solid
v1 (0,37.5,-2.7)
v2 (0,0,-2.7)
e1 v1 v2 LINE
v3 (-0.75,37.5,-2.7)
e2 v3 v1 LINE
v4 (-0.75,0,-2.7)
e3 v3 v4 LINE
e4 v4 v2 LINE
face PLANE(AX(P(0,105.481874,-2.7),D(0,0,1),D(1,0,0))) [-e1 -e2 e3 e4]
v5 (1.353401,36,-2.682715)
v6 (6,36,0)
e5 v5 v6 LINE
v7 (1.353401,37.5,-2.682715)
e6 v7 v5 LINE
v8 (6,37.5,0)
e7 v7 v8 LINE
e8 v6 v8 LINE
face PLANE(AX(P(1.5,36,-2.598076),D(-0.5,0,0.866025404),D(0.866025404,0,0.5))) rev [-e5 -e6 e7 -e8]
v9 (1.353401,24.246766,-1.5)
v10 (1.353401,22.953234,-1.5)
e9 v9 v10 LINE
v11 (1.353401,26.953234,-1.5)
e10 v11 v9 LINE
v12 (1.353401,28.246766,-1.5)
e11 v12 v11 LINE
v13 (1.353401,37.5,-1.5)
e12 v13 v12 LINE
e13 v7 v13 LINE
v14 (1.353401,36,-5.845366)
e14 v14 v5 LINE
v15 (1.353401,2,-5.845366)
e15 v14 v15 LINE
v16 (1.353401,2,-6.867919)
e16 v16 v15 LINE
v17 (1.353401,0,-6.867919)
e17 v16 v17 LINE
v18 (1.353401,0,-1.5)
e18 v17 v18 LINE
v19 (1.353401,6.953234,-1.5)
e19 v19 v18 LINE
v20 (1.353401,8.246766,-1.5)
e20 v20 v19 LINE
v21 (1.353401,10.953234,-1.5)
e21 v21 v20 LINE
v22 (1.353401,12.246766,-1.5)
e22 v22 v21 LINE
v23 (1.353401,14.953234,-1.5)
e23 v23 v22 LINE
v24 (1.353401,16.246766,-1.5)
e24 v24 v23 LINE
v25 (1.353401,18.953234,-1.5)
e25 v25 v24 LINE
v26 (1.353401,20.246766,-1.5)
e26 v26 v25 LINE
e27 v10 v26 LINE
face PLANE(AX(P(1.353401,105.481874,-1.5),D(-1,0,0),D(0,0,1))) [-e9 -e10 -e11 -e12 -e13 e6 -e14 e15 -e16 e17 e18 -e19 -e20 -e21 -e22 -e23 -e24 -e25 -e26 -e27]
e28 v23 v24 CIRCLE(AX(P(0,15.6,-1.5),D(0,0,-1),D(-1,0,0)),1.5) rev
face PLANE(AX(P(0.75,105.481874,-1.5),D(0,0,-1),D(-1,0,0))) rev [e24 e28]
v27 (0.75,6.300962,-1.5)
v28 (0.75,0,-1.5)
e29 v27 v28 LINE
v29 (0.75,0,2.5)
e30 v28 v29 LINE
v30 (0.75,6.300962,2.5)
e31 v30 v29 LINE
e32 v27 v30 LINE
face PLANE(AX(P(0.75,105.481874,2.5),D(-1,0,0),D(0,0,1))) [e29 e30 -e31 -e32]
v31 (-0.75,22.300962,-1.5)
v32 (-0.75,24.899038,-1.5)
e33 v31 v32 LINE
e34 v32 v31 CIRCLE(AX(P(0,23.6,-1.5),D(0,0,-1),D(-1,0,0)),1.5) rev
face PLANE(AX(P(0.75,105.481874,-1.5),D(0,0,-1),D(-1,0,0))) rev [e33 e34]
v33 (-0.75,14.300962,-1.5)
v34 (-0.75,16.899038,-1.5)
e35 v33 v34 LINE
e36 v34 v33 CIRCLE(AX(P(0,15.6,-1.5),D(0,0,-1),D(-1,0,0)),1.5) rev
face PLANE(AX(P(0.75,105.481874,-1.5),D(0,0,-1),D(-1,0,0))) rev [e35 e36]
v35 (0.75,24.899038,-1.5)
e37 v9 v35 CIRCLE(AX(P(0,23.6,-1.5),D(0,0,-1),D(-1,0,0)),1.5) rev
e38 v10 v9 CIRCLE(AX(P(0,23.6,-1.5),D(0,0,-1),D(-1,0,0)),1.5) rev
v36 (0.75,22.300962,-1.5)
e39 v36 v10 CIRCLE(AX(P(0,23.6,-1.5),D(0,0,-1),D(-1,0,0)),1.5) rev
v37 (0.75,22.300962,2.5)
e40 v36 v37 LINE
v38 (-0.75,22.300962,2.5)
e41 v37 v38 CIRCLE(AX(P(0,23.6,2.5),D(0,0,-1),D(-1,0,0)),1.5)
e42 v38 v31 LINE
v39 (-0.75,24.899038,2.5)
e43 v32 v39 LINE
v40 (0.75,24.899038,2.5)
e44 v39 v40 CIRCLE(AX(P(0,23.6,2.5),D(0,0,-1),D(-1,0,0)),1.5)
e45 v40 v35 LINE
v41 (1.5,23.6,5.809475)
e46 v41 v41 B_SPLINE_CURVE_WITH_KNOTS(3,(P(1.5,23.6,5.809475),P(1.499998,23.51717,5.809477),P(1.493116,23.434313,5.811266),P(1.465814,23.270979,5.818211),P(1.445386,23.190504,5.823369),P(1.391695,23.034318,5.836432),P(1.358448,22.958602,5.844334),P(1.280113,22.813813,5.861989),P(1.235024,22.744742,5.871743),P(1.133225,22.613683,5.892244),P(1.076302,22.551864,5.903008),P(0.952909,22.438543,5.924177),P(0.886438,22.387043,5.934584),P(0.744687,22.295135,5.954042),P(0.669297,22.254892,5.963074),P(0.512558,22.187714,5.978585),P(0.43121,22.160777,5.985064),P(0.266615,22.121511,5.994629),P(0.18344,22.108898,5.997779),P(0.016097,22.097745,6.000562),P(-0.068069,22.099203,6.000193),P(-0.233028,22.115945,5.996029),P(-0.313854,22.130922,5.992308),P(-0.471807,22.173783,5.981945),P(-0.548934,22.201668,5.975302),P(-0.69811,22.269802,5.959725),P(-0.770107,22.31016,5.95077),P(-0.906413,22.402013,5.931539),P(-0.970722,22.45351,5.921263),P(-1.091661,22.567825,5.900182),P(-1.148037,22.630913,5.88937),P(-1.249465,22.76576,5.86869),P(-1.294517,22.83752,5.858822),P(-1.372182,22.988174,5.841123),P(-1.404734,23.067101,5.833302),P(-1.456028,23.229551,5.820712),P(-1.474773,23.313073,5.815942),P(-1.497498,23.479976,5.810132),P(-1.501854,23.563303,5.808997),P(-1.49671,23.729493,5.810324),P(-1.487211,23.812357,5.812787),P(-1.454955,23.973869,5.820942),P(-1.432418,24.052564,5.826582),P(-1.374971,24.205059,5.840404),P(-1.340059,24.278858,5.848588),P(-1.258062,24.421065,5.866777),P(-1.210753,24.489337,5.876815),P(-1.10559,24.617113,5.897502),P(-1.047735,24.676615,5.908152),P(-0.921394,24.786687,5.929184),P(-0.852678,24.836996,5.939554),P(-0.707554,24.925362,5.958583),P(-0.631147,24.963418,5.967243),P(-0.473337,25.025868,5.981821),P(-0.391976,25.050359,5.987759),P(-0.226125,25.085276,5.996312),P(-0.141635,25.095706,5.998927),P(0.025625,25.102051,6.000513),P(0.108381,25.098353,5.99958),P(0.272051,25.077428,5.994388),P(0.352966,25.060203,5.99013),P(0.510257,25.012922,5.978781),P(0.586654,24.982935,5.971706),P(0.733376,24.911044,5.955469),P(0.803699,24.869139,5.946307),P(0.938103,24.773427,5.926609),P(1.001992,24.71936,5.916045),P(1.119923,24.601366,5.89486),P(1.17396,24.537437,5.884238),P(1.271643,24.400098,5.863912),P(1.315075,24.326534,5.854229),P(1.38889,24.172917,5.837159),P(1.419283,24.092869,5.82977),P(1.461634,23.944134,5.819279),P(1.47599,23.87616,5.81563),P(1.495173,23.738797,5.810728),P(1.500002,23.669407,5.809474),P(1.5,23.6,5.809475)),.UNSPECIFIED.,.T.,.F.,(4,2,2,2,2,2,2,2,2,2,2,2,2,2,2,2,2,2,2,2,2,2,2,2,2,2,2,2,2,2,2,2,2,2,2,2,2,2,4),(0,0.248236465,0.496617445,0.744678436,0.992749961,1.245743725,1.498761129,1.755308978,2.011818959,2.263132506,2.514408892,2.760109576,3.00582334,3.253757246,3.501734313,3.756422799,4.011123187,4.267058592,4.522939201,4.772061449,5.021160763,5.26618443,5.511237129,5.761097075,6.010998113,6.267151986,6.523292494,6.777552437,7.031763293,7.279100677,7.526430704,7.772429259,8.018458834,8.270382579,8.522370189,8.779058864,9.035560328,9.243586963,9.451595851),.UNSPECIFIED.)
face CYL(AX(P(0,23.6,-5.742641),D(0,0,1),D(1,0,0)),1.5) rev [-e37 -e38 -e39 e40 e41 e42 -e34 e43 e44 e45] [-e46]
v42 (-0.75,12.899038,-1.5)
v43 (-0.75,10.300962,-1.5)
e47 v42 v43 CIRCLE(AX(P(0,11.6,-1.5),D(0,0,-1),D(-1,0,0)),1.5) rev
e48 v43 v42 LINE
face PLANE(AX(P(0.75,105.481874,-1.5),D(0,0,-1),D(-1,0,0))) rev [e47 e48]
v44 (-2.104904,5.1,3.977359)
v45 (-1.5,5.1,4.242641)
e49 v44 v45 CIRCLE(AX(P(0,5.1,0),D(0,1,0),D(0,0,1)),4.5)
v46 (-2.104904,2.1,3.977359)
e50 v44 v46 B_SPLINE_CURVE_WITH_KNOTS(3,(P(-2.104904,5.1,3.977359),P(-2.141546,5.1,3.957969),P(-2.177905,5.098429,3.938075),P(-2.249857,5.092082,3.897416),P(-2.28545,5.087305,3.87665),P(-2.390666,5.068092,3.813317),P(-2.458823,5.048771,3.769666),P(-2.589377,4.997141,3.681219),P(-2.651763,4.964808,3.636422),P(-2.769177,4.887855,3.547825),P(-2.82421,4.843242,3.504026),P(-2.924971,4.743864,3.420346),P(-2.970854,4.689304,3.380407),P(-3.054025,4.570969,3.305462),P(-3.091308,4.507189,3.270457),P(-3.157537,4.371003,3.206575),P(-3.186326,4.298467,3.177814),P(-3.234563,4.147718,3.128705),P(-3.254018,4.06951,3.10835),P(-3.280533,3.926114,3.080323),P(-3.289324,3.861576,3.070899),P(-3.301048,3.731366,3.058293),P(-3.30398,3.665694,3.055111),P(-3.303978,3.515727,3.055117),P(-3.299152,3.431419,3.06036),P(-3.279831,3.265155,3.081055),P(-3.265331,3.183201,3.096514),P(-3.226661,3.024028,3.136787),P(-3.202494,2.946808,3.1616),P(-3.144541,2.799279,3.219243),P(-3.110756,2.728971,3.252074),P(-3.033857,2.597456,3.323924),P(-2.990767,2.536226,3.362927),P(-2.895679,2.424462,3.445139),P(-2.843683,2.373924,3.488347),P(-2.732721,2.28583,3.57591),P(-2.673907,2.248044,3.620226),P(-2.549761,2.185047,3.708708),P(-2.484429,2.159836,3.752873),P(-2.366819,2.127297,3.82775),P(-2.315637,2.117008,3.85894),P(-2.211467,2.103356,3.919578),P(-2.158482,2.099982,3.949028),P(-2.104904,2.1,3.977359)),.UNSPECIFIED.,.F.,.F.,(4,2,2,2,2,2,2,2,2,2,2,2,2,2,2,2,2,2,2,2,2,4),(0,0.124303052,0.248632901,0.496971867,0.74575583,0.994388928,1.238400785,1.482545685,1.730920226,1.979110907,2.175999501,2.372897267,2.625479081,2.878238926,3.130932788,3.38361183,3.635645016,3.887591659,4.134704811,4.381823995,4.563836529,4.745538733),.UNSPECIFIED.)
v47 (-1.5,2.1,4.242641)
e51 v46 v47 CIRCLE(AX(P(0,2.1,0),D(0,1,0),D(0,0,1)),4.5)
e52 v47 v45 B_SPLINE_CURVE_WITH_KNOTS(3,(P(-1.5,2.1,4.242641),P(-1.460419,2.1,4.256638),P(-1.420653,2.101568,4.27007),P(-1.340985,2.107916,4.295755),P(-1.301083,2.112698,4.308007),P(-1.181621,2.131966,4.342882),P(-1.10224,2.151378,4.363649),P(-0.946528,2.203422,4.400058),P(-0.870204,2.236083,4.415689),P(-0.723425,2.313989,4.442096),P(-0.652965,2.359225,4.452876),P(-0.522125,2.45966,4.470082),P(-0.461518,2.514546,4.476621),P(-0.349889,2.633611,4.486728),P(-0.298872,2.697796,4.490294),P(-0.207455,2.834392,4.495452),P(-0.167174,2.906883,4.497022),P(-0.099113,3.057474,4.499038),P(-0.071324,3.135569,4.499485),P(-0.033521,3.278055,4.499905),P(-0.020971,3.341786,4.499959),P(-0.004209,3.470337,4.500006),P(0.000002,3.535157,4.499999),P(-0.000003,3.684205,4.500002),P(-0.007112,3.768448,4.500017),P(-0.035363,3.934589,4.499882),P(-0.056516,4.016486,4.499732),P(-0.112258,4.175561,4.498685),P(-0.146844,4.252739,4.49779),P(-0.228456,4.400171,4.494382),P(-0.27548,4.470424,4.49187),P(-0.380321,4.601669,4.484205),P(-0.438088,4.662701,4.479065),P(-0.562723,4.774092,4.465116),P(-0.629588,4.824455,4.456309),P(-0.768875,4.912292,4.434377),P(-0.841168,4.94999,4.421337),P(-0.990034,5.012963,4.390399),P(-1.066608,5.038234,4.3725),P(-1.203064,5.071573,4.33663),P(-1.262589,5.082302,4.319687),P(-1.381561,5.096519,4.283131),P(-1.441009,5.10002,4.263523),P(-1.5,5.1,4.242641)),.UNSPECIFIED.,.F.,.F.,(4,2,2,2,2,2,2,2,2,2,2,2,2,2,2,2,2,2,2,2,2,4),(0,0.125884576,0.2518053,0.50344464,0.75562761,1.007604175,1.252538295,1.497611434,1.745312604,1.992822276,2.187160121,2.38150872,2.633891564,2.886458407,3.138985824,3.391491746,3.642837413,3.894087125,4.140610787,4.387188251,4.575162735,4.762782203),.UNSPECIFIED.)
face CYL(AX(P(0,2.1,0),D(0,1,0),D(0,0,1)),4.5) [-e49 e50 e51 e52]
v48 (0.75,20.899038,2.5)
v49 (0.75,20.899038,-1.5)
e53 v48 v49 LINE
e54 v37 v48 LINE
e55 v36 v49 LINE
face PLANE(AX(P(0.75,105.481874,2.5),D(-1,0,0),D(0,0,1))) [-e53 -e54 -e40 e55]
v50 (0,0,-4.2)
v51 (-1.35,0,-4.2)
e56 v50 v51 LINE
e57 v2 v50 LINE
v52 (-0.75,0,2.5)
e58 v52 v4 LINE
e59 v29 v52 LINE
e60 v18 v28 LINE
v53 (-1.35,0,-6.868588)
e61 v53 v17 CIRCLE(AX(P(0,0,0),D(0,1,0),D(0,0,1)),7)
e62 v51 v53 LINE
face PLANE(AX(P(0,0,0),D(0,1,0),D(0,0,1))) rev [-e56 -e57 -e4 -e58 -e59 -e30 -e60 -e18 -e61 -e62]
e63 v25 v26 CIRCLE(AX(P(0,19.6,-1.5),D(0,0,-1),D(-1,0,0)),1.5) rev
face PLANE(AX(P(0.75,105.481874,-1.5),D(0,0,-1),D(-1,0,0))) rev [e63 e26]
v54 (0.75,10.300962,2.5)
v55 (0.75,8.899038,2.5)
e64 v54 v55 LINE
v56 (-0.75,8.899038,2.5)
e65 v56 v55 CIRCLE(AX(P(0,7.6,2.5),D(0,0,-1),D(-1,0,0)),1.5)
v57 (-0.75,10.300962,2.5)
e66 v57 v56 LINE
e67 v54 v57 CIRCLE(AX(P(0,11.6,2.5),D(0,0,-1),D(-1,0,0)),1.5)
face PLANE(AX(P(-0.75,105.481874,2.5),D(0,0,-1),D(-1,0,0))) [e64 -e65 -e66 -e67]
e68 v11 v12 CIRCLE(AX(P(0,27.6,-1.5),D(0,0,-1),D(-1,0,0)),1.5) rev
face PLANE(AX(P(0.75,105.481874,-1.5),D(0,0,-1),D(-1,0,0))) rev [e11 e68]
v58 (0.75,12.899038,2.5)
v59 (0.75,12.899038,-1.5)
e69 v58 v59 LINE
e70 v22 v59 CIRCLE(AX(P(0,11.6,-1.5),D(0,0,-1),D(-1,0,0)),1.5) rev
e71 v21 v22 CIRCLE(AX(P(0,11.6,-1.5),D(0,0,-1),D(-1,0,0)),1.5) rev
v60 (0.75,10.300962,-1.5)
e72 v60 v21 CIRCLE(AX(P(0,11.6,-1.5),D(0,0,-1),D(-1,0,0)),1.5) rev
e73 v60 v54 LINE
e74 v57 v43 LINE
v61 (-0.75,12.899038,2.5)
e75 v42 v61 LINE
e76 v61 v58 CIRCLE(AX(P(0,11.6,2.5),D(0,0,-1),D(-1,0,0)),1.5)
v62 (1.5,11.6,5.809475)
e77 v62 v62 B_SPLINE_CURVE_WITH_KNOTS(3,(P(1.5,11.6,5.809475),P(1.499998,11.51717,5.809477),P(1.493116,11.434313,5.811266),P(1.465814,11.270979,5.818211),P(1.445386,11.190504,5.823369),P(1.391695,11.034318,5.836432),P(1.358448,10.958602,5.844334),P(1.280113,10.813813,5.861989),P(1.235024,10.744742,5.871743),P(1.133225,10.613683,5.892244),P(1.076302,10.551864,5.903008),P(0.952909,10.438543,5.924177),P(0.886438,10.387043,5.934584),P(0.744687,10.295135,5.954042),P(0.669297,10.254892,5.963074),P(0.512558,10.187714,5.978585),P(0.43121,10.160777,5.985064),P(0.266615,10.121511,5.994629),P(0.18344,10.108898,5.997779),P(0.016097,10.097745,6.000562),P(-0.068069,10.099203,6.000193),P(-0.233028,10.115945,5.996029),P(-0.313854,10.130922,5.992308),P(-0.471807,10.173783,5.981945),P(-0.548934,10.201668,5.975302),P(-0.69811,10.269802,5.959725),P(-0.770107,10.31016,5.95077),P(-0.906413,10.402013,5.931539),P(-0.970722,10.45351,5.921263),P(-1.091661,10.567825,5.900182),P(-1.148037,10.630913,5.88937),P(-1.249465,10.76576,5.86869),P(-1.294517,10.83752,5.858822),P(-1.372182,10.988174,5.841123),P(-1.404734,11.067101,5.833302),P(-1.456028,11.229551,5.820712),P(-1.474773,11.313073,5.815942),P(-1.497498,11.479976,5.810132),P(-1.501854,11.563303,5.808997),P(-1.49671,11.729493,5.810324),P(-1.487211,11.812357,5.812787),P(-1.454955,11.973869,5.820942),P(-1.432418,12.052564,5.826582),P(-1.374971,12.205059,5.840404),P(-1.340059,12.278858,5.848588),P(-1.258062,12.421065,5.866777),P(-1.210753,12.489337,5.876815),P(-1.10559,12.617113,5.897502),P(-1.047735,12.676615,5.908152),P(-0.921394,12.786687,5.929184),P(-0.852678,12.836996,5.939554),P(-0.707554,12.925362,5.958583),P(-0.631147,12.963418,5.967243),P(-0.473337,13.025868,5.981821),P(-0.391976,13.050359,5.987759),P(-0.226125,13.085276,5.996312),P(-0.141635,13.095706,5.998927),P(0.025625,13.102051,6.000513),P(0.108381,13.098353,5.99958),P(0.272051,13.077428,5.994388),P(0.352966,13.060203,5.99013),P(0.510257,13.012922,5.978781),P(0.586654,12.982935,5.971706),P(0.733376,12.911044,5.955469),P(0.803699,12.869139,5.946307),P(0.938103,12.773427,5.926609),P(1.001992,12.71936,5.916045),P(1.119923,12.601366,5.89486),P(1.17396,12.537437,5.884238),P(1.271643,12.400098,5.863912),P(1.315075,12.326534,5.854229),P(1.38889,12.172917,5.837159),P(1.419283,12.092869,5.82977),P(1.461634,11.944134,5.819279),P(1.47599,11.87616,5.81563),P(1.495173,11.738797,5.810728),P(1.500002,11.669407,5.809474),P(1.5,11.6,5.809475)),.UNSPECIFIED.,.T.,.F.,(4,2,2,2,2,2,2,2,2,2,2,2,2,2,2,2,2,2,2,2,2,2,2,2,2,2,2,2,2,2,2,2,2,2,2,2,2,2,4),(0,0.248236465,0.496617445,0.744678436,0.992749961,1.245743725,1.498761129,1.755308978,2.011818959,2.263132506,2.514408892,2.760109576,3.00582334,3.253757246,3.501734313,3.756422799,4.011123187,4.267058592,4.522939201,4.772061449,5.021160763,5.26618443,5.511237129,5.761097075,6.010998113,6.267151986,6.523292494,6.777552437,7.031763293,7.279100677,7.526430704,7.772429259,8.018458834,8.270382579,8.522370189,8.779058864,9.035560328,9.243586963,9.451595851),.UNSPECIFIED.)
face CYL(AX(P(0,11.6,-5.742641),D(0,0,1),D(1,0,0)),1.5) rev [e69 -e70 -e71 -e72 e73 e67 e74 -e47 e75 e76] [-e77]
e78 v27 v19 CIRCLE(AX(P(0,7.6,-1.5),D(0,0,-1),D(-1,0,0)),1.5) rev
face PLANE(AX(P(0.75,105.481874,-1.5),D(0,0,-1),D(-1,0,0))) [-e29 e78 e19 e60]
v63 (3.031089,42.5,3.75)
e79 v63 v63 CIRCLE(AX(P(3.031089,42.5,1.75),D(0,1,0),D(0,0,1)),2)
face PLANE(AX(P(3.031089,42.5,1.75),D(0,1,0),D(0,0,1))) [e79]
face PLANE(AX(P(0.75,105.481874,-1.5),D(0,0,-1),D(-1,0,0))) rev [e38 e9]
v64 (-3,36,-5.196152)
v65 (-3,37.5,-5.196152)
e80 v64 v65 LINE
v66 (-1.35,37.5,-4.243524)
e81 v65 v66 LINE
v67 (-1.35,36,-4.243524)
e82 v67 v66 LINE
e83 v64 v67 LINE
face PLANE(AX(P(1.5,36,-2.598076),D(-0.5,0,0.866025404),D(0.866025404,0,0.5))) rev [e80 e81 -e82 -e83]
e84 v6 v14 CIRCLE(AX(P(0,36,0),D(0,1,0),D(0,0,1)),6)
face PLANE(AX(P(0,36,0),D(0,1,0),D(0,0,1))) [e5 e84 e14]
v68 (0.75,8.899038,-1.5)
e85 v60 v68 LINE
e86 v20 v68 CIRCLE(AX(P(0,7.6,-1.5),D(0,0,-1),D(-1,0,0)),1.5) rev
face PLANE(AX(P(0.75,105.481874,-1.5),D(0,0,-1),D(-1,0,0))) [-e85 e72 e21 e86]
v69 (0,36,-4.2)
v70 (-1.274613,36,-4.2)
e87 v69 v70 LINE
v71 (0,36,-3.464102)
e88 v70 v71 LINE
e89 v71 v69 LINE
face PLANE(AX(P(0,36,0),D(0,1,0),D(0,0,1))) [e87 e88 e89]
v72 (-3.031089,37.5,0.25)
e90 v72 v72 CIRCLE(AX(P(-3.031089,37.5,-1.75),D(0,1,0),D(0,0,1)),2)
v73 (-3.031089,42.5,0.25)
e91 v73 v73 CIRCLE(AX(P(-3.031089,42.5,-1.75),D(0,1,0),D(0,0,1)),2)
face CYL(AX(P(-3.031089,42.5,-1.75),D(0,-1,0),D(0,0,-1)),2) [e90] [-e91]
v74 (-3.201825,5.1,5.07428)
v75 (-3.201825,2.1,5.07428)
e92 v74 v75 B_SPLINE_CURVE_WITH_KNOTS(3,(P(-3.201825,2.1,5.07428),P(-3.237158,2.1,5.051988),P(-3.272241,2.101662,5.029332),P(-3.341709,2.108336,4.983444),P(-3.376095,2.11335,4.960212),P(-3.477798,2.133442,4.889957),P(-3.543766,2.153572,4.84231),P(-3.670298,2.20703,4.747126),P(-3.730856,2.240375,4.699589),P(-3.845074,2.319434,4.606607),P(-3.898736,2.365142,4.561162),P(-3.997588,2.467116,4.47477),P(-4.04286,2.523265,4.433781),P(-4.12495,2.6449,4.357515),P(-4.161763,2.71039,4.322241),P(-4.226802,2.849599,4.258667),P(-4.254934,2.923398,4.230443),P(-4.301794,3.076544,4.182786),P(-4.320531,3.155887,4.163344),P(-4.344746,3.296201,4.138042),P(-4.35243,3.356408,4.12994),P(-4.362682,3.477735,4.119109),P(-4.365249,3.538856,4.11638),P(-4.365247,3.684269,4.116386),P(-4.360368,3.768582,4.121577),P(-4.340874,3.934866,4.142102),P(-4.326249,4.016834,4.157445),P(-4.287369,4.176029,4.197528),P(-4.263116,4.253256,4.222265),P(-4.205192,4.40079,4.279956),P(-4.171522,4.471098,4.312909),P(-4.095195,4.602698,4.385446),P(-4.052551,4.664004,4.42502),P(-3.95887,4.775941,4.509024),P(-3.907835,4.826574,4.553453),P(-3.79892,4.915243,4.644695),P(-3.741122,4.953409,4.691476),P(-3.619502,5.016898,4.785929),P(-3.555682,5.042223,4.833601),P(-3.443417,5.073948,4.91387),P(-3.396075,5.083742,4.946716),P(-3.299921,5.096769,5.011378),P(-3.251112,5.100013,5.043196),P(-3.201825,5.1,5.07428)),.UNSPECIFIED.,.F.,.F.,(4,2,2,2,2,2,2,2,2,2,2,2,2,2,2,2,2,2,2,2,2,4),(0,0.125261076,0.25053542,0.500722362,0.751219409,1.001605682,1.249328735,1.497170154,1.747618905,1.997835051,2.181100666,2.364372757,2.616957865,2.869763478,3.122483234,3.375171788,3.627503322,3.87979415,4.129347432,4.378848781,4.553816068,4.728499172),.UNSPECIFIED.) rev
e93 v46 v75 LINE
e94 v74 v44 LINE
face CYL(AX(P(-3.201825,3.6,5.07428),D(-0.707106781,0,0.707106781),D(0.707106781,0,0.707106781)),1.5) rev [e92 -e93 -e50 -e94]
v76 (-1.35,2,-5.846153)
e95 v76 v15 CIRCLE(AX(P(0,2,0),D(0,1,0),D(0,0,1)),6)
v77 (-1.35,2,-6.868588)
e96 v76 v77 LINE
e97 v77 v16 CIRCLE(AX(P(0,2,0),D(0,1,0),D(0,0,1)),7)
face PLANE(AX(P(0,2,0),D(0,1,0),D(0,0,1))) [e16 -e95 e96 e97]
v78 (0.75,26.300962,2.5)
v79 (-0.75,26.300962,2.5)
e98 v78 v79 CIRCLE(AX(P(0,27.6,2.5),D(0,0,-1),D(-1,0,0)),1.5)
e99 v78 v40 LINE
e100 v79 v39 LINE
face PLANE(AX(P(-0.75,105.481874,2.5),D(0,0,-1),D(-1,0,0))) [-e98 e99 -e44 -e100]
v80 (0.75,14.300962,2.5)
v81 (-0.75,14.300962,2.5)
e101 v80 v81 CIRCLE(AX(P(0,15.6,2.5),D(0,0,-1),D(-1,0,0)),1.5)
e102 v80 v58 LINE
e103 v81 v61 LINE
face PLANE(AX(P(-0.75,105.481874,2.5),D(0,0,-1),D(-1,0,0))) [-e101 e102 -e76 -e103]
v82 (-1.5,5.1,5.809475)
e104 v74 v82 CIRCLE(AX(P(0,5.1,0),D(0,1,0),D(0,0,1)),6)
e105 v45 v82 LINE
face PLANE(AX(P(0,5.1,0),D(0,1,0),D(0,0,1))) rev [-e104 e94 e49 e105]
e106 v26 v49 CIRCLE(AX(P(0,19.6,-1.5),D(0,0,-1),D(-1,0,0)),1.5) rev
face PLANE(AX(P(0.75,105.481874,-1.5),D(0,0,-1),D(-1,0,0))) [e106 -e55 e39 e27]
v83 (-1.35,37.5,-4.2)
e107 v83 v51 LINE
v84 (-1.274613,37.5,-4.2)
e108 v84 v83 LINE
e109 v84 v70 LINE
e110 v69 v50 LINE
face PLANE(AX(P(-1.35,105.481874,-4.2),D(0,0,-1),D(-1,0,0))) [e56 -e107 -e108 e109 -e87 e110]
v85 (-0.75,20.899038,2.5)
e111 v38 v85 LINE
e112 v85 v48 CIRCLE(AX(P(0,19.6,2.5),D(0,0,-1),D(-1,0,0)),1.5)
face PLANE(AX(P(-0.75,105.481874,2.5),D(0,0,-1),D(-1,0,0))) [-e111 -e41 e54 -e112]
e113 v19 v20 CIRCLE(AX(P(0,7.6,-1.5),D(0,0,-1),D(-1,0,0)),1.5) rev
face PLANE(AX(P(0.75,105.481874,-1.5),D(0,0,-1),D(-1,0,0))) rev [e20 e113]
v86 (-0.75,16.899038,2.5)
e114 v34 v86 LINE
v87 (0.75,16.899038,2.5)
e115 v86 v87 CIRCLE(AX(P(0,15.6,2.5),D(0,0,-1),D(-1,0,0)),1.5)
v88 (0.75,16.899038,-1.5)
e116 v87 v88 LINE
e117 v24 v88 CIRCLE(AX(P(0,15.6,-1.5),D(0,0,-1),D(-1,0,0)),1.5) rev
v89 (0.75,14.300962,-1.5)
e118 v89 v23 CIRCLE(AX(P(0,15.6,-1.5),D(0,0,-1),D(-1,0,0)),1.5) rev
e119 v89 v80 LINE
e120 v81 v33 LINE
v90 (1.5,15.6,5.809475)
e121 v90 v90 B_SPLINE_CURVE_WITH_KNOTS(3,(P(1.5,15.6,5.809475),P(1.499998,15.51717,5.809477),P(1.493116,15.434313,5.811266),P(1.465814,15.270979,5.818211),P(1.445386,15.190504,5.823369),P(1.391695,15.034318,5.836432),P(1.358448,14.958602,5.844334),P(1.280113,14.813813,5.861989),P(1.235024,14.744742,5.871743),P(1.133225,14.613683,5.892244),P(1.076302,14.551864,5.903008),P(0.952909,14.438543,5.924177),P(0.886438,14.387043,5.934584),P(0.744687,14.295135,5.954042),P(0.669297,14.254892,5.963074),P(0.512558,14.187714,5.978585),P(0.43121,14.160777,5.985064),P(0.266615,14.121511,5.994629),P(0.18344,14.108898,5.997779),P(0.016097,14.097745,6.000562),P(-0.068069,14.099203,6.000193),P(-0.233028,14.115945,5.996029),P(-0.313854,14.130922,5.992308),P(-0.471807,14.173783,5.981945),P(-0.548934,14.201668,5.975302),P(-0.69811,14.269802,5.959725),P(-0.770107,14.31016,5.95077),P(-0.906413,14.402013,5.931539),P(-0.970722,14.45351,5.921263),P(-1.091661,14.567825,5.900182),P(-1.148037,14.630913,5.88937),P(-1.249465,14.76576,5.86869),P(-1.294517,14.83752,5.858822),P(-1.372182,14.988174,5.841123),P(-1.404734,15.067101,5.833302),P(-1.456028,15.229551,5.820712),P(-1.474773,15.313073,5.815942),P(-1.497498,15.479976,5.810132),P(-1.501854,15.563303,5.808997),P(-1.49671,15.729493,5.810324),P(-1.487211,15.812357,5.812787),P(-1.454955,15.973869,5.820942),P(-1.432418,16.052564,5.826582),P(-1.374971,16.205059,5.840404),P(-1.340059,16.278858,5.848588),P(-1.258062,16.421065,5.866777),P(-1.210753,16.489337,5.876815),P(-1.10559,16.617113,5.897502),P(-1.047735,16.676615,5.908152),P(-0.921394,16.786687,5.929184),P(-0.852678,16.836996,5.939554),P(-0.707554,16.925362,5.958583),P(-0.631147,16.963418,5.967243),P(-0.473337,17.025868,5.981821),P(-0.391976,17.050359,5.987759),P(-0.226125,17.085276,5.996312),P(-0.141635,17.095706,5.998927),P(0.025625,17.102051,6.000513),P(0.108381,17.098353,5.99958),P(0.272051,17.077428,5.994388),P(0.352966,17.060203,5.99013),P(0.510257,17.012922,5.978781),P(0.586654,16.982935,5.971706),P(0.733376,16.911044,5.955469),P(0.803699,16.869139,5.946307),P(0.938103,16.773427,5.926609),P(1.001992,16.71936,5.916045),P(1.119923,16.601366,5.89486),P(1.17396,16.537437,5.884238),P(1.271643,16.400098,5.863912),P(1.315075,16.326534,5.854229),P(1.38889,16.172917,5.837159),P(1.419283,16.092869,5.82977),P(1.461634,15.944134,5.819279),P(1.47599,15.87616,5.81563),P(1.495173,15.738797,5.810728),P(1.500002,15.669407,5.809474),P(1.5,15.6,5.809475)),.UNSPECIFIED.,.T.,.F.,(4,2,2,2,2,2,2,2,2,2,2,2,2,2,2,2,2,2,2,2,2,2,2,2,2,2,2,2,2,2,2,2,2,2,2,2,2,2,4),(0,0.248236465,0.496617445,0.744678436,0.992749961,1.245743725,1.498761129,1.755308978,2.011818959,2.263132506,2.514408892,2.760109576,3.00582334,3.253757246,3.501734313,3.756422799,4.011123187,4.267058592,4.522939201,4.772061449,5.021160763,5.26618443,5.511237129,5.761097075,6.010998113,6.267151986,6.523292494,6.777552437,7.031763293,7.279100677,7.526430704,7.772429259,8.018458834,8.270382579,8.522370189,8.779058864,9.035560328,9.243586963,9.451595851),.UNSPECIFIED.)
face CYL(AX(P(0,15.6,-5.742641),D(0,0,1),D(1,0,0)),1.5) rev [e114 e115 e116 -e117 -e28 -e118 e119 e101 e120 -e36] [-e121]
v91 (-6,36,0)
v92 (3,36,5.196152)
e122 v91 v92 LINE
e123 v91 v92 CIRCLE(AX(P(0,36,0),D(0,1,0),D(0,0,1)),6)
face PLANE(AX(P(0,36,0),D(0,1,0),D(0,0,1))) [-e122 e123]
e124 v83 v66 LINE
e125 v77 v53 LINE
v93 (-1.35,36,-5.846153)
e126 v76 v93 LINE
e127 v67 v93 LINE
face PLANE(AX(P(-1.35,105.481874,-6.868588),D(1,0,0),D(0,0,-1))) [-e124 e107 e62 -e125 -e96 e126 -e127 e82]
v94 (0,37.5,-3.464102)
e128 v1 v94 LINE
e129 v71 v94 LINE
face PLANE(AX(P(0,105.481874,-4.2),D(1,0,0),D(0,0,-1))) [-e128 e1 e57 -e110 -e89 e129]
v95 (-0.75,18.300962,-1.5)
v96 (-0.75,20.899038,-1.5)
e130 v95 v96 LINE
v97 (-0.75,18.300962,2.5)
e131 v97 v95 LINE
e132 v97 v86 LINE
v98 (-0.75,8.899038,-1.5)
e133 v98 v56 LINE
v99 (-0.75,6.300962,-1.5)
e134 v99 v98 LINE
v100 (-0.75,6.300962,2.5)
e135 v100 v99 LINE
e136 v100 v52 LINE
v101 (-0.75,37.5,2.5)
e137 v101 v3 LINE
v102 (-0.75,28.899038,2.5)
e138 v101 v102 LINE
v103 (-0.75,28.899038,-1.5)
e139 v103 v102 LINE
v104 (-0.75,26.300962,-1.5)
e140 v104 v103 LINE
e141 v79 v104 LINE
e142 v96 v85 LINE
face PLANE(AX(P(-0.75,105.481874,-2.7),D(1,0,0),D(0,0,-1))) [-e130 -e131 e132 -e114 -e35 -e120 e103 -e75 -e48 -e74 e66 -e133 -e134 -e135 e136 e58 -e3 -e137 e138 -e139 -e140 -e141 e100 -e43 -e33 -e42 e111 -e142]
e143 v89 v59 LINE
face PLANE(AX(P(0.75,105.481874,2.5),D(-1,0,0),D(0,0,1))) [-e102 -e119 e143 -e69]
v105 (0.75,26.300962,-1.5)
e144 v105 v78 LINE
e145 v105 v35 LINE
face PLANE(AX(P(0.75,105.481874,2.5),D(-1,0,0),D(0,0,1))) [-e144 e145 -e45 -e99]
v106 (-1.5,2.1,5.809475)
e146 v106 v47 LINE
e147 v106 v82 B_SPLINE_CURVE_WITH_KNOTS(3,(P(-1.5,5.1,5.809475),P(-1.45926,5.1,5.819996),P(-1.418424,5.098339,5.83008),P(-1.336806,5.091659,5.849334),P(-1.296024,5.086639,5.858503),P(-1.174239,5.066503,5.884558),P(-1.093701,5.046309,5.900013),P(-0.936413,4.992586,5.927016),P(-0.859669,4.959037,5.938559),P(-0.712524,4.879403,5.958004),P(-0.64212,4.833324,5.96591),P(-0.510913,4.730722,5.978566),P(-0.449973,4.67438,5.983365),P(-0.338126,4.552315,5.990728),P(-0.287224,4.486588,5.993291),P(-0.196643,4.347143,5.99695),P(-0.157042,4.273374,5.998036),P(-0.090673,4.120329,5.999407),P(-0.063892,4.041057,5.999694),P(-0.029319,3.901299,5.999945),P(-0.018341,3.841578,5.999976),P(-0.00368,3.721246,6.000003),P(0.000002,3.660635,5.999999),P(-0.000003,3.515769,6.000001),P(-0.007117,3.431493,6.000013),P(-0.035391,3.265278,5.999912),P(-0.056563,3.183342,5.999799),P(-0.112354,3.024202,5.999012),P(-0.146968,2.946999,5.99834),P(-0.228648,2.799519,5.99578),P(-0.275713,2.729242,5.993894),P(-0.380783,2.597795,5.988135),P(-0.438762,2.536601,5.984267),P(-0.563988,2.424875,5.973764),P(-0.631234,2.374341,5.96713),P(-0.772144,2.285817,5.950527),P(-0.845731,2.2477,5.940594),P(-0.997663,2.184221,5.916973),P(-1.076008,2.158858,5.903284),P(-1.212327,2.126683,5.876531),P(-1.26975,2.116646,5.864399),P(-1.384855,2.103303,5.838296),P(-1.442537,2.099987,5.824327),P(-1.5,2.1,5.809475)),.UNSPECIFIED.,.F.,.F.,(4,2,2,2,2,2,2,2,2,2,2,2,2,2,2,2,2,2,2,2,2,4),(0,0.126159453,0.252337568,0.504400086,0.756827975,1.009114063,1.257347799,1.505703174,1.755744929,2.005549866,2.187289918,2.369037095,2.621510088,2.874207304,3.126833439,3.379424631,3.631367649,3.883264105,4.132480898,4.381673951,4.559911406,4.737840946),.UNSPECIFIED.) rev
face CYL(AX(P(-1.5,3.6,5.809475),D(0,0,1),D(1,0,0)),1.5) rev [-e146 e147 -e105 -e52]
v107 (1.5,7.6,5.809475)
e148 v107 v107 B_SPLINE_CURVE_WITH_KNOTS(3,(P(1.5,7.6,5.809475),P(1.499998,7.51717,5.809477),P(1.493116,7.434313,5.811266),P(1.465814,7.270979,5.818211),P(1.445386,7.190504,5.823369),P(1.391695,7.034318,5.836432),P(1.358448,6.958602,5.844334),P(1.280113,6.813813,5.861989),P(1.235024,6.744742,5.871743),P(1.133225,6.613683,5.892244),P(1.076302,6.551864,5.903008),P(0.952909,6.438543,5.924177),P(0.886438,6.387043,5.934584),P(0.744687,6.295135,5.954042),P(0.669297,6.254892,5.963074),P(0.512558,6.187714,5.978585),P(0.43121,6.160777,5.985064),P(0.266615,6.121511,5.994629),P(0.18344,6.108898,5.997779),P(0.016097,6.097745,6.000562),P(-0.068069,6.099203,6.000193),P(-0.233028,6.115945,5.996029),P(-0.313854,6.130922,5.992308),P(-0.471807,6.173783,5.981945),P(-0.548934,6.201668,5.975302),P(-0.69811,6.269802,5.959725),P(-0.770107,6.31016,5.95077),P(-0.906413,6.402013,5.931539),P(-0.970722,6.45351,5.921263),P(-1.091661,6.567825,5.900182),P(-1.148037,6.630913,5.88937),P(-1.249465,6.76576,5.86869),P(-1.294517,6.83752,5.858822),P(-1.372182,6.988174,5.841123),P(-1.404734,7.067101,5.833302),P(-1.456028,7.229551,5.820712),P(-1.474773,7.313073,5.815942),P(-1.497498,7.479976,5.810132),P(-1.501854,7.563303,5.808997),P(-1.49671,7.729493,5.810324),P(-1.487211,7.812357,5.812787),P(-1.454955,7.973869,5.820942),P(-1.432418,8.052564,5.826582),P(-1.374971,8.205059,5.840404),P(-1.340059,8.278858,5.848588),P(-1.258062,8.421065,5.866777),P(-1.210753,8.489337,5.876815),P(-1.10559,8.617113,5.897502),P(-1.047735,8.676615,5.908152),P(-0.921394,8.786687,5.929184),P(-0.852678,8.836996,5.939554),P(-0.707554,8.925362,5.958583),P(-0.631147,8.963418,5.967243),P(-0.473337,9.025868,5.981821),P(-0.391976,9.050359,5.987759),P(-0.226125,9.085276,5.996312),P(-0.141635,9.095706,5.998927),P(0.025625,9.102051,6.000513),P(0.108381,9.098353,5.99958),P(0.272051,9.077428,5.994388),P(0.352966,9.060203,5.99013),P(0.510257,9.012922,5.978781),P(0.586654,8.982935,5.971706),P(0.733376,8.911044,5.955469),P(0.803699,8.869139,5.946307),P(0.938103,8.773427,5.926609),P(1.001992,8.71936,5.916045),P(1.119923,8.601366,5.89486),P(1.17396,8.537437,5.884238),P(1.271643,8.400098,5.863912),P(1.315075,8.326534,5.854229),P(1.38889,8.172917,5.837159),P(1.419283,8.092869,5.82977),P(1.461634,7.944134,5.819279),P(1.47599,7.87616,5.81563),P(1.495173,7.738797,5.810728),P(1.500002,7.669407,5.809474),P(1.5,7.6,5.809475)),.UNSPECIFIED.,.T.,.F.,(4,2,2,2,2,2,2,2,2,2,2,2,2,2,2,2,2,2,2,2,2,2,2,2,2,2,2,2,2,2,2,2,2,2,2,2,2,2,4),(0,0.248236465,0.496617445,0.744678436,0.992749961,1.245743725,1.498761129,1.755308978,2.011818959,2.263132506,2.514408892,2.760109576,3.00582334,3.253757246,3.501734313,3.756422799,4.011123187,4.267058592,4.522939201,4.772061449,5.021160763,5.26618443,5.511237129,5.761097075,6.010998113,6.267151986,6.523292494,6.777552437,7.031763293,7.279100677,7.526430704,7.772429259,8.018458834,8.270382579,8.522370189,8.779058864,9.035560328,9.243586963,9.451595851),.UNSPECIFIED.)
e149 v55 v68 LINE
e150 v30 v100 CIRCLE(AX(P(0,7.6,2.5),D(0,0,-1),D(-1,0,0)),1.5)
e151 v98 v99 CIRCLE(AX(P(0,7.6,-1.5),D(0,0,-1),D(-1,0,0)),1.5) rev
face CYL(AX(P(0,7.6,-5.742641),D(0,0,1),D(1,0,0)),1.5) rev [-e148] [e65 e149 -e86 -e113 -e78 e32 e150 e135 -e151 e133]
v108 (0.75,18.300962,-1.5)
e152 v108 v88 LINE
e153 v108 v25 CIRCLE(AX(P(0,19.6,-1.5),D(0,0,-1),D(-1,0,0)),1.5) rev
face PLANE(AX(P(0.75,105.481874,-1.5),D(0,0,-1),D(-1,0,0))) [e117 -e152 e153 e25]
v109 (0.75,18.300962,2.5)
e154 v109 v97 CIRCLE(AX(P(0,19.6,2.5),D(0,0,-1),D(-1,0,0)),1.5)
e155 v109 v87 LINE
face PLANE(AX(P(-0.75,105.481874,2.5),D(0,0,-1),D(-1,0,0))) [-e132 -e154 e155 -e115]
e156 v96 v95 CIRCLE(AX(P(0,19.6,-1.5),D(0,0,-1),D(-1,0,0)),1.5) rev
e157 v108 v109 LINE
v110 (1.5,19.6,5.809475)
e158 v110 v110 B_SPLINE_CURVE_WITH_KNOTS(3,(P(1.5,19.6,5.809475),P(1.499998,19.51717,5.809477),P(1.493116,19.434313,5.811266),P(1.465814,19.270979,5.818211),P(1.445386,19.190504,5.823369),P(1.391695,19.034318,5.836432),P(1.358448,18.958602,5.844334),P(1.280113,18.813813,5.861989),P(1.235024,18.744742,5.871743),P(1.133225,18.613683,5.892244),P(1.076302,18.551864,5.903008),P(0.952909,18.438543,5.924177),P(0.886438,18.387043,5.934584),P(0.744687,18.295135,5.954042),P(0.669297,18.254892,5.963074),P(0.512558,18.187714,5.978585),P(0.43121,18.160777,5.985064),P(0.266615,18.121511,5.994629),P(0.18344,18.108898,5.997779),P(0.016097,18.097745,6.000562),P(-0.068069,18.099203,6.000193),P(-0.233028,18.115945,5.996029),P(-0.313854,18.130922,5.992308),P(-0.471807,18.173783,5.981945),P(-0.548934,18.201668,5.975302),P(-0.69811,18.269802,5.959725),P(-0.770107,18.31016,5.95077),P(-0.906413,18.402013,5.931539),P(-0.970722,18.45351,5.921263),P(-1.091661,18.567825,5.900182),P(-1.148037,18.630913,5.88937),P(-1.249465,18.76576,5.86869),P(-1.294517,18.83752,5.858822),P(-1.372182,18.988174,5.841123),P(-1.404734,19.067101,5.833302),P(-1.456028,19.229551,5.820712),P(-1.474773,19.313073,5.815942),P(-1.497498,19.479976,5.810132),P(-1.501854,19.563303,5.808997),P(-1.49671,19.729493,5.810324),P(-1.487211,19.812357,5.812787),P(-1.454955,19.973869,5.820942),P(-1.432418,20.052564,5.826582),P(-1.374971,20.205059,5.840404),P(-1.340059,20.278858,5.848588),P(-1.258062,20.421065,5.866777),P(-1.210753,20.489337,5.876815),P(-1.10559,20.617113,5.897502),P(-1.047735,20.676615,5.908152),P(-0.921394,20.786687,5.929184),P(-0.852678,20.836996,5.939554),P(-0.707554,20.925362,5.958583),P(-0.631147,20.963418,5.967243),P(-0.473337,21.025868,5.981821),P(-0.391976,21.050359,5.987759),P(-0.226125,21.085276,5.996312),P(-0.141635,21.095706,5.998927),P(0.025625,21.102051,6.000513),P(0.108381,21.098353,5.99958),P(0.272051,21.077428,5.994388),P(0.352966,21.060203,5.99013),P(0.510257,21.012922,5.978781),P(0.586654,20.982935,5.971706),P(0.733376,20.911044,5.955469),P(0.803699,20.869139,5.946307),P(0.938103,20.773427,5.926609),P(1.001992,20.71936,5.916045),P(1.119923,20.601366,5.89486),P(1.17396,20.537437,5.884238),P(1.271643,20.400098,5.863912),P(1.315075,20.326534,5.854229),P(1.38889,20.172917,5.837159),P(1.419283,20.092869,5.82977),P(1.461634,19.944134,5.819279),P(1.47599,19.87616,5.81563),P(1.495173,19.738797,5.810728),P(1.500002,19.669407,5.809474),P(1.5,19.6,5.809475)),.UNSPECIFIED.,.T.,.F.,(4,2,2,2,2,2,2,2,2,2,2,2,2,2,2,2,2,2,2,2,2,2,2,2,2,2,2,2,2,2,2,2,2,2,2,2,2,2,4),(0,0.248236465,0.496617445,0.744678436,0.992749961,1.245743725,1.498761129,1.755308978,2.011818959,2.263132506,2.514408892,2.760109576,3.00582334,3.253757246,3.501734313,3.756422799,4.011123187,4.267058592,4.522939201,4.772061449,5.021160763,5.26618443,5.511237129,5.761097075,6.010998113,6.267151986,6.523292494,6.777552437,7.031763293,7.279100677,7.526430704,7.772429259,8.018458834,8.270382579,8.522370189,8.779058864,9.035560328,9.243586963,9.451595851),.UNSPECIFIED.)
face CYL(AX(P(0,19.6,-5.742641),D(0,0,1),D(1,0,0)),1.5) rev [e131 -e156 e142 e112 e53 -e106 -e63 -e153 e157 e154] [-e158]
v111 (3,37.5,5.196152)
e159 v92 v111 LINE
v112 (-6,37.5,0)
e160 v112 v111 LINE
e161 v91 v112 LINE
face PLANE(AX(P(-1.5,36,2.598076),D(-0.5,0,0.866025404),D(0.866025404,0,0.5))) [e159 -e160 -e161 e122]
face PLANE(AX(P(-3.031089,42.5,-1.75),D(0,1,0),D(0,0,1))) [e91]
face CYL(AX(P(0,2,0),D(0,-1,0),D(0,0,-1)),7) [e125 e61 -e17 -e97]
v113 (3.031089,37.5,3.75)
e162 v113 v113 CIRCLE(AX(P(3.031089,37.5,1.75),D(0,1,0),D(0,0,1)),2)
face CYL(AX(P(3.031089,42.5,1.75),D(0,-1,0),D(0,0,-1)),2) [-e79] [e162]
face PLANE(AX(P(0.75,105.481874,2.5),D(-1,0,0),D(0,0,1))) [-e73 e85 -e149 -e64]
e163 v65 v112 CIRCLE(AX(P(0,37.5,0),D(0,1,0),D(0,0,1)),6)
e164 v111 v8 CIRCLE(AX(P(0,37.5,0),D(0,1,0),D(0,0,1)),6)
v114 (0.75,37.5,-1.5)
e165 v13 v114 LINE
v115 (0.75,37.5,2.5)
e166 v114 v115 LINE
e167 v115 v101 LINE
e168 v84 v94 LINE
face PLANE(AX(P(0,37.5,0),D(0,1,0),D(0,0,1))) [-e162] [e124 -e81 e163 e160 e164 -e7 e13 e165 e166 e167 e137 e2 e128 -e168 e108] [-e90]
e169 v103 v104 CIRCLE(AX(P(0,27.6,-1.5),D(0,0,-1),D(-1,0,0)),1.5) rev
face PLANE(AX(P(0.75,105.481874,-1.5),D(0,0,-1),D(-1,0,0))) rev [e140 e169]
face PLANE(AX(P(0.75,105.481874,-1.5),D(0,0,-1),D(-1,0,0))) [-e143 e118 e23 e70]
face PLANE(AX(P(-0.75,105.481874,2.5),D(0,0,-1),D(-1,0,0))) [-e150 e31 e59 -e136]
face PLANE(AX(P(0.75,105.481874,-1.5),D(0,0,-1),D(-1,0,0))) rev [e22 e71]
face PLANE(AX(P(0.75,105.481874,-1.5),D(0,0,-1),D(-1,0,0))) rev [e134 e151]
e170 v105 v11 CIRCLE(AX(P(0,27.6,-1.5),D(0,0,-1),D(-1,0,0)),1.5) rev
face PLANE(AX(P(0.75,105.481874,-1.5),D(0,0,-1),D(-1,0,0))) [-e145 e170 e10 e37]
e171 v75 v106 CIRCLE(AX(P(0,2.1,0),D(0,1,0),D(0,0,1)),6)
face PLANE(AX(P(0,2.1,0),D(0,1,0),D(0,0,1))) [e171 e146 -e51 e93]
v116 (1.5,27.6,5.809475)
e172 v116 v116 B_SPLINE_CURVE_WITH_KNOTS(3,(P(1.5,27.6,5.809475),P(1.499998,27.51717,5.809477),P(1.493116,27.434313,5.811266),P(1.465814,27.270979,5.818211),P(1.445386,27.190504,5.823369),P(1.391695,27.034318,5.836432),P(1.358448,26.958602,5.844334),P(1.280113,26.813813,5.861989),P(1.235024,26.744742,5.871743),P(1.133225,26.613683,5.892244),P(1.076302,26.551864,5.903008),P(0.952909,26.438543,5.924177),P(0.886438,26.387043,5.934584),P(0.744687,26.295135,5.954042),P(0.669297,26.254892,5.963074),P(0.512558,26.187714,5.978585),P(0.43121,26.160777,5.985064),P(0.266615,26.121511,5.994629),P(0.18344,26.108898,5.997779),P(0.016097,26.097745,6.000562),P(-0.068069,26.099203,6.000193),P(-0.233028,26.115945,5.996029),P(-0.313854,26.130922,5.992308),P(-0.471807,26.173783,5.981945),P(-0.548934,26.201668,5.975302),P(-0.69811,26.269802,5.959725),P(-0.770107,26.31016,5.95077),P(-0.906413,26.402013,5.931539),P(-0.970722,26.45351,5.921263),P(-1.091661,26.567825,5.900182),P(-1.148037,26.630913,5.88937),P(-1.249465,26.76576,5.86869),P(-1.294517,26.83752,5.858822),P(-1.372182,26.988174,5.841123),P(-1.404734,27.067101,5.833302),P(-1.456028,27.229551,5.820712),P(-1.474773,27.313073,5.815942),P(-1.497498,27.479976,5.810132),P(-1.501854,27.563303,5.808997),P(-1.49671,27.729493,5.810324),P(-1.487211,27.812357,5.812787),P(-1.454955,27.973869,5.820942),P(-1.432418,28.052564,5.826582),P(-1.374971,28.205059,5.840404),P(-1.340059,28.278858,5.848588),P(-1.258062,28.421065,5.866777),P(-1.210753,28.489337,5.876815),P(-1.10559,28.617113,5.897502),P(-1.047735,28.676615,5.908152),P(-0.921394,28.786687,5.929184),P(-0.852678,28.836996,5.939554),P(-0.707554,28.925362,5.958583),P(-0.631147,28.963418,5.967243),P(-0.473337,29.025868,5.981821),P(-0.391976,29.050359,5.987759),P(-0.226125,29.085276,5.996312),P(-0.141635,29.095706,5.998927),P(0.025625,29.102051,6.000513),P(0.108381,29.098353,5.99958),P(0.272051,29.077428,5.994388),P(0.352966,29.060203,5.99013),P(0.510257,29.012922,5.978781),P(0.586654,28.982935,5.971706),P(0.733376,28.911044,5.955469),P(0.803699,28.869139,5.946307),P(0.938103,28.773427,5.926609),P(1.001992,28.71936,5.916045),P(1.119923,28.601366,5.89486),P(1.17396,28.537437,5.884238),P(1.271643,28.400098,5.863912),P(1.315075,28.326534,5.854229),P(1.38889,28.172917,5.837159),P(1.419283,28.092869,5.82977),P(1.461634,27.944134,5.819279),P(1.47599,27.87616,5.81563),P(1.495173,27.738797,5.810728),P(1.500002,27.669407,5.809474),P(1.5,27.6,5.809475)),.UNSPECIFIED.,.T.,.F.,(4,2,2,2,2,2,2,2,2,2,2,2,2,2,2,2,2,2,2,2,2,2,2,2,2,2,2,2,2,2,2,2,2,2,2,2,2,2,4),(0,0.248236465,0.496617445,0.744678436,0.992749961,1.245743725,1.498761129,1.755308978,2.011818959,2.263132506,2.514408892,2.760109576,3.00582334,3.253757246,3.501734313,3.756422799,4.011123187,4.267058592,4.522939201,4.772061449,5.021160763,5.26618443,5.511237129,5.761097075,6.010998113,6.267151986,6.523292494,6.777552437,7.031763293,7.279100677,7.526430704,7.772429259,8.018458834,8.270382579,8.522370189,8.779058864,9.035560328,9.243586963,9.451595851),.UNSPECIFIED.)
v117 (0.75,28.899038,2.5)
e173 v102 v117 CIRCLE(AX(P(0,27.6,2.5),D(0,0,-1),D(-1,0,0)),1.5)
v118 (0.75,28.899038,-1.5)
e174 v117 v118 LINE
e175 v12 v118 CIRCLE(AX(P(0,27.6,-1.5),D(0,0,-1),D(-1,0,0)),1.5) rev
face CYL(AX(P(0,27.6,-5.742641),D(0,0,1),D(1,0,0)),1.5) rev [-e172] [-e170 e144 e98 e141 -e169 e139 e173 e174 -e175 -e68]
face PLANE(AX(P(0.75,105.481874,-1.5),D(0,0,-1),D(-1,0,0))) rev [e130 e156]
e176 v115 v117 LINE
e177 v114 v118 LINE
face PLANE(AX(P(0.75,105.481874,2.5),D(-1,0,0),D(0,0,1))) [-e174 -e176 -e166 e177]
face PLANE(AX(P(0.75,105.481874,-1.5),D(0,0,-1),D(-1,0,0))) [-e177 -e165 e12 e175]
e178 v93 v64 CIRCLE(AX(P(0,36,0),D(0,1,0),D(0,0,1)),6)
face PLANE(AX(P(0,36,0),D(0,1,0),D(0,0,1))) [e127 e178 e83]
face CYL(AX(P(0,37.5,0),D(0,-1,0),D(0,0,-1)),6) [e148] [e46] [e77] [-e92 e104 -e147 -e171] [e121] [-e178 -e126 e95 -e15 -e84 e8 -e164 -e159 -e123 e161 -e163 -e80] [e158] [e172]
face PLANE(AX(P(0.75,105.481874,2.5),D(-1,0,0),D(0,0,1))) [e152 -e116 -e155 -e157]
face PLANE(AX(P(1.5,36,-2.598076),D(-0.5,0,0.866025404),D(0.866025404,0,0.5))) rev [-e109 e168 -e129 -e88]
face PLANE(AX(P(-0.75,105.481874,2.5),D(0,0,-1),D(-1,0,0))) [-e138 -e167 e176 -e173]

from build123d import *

# Parameters (mm, degrees)
SKETCH_1_R               = 7
EXTRUDE_1_DEPTH          = 2
SKETCH_2_R               = 6
EXTRUDE_2_DEPTH          = 35.5
CUT_EXTRUDE_1_DEPTH      = 39.784661917
CUT_EXTRUDE_1_DEPTH_BACK = 1.5
SKETCH_4_R               = 2
EXTRUDE_3_DEPTH          = 5
CUT_EXTRUDE_2_DEPTH      = 44.637713047
CUT_EXTRUDE_2_DEPTH_BACK = 44.637713047
CUT_EXTRUDE_6_OUTLINE_W  = 1.5
CUT_EXTRUDE_6_OUTLINE_H  = 7.50002714
PATTERN_LINEAR_2_COUNT   = 6
PATTERN_LINEAR_2_PITCH   = 4
CUT_EXTRUDE_7_DEPTH      = 1.5
FILLET_2_R               = 1.5
FILLET_3_R               = 1.5


# Read off the part's stored shape, not the designer's step: 切除-拉伸6
with BuildPart() as part:
    # 草图1 → 凸台-拉伸1 (new body)
    with BuildSketch(Plane(origin=(0, 0, 0), x_dir=(1, 0, 0), z_dir=(0, 1, 0))):
        with Locations(Location((0, 0, 0), (0, 0, 270))):
            Circle(SKETCH_1_R)
    extrude(amount=EXTRUDE_1_DEPTH)

    # 草图2 → 凸台-拉伸2 (add)
    with BuildSketch(Plane(origin=(0, 2, 0), x_dir=(1, 0, 0), z_dir=(0, 1, 0))):
        with Locations(Location((0, 0, 0), (0, 0, 270))):
            Circle(SKETCH_2_R)
    extrude(amount=EXTRUDE_2_DEPTH)

    # 草图3 → 切除-拉伸1 (cut, two sides: drawn at the far end of the back side and taken through both)
    with BuildSketch(Plane(origin=(0, 37.5, 0), x_dir=(1, 0, 0), z_dir=(0, 1, 0)).offset(-CUT_EXTRUDE_1_DEPTH_BACK)):
        with BuildLine():
            Line((0.0612495, -3.49946403), (-3.0612495, -1.696688392))
            ThreePointArc((-3.0612495, -1.696688392), (-1.75, -3.031088913), (0.0612495, -3.49946403))
        make_face()
        with BuildLine():
            ThreePointArc((0.0612495, -3.49946403), (-1.75, -3.031088913), (-3.0612495, -1.696688392))
            Line((-3.0612495, -1.696688392), (-6, 0))
            ThreePointArc((-6, 0), (-3, -5.196152423), (3, -5.196152423))
            Line((3, -5.196152423), (0.0612495, -3.49946403))
        make_face()
        with BuildLine():
            Line((-3, 5.196152423), (-0.0612495, 3.49946403))
            ThreePointArc((-0.0612495, 3.49946403), (1.75, 3.031088913), (3.0612495, 1.696688392))
            Line((3.0612495, 1.696688392), (6, 0))
            ThreePointArc((6, 0), (3, 5.196152423), (-3, 5.196152423))
        make_face()
        with BuildLine():
            ThreePointArc((3.0612495, 1.696688392), (1.75, 3.031088913), (-0.0612495, 3.49946403))
            Line((-0.0612495, 3.49946403), (3.0612495, 1.696688392))
        make_face()
    extrude(amount=CUT_EXTRUDE_1_DEPTH + CUT_EXTRUDE_1_DEPTH_BACK, mode=Mode.SUBTRACT)

    # 草图4 → 凸台-拉伸3 (add)
    with BuildSketch(Plane(origin=(0, 37.5, 0), x_dir=(1, 0, 0), z_dir=(0, 1, 0))):
        with Locations(Location((3.031088913, -1.75, 0), (0, 0, 270))):
            Circle(SKETCH_4_R)
        with Locations(Location((-3.031088913, 1.75, 0), (0, 0, 270))):
            Circle(SKETCH_4_R)
    extrude(amount=EXTRUDE_3_DEPTH)

    # 草图5 → 切除-拉伸2 (cut, two sides: drawn at the far end of the back side and taken through both)
    with BuildSketch(Plane(origin=(0, 0, 0), x_dir=(1, 0, 0), z_dir=(0, 1, 0)).offset(-CUT_EXTRUDE_2_DEPTH_BACK)):
        Polygon((-1.35, 49.247498963), (-1.35, 6.868587919), (-1.35, 4.2), (0, 4.2), (0, 2.7), (-0.75, 2.7), (-0.75, -2.5), (0.75, -2.5), (0.75, 1.5), (1.353400632, 1.5), (1.353400632, 6.867918661), (1.353400632, 49.246829705), (1.374383416, 134.004649195), (-1.329017216, 134.005318453), align=None)
    extrude(amount=CUT_EXTRUDE_2_DEPTH + CUT_EXTRUDE_2_DEPTH_BACK, mode=Mode.SUBTRACT)

    # 切除-拉伸6 outline → 切除-拉伸6 (revolve, cut)
    with BuildSketch(Plane.XZ.offset(-27.6)):
        with Locations((0.75, 2.25001357)):
            Rectangle(CUT_EXTRUDE_6_OUTLINE_W, CUT_EXTRUDE_6_OUTLINE_H)
    cut_extrude_6 = revolve(axis=Axis((0, 27.6, 0), (0, 0, 1)), mode=Mode.SUBTRACT)

    # 阵列(线性)2: 切除-拉伸6 ×6
    with Locations(*[(0, -i * PATTERN_LINEAR_2_PITCH, 0) for i in range(1, PATTERN_LINEAR_2_COUNT)]):
        add(cut_extrude_6, mode=Mode.SUBTRACT)

    # 草图15 → 切除-拉伸7 (cut, symmetric)
    with BuildSketch(Plane(origin=(0, 3.6, 0), x_dir=(1, 0, 0), z_dir=(0, 1, 0))):
        with BuildLine():
            Line((0, -6), (0, -4.5))
            ThreePointArc((0, -4.5), (-1.803051209, -4.122985125), (-3.303979251, -3.055113928))
            Line((-3.303979251, -3.055113928), (-4.36524821, -4.116382886))
            ThreePointArc((-4.36524821, -4.116382886), (-2.377151939, -5.509006141), (0, -6))
        make_face()
    extrude(amount=CUT_EXTRUDE_7_DEPTH, both=True, mode=Mode.SUBTRACT)

    # 圆角2
    fillet_2_edges = [part.edges().sort_by_distance(p)[0] for p in [
        (0, 5.1, 5.25),
        (0, 2.1, 5.25),
    ]]
    fillet(fillet_2_edges, radius=FILLET_2_R - 0.0001)  # a hair under: the kernel refuses the full size

    # 圆角3
    fillet_3_edges = [part.edges().sort_by_distance(p)[0] for p in [
        (-3.83461373, 2.1, 3.585748407),
        (-3.83461373, 5.1, 3.585748407),
    ]]
    fillet(fillet_3_edges, radius=FILLET_3_R - 0.0001)  # a hair under: the kernel refuses the full size


solid = part.part
